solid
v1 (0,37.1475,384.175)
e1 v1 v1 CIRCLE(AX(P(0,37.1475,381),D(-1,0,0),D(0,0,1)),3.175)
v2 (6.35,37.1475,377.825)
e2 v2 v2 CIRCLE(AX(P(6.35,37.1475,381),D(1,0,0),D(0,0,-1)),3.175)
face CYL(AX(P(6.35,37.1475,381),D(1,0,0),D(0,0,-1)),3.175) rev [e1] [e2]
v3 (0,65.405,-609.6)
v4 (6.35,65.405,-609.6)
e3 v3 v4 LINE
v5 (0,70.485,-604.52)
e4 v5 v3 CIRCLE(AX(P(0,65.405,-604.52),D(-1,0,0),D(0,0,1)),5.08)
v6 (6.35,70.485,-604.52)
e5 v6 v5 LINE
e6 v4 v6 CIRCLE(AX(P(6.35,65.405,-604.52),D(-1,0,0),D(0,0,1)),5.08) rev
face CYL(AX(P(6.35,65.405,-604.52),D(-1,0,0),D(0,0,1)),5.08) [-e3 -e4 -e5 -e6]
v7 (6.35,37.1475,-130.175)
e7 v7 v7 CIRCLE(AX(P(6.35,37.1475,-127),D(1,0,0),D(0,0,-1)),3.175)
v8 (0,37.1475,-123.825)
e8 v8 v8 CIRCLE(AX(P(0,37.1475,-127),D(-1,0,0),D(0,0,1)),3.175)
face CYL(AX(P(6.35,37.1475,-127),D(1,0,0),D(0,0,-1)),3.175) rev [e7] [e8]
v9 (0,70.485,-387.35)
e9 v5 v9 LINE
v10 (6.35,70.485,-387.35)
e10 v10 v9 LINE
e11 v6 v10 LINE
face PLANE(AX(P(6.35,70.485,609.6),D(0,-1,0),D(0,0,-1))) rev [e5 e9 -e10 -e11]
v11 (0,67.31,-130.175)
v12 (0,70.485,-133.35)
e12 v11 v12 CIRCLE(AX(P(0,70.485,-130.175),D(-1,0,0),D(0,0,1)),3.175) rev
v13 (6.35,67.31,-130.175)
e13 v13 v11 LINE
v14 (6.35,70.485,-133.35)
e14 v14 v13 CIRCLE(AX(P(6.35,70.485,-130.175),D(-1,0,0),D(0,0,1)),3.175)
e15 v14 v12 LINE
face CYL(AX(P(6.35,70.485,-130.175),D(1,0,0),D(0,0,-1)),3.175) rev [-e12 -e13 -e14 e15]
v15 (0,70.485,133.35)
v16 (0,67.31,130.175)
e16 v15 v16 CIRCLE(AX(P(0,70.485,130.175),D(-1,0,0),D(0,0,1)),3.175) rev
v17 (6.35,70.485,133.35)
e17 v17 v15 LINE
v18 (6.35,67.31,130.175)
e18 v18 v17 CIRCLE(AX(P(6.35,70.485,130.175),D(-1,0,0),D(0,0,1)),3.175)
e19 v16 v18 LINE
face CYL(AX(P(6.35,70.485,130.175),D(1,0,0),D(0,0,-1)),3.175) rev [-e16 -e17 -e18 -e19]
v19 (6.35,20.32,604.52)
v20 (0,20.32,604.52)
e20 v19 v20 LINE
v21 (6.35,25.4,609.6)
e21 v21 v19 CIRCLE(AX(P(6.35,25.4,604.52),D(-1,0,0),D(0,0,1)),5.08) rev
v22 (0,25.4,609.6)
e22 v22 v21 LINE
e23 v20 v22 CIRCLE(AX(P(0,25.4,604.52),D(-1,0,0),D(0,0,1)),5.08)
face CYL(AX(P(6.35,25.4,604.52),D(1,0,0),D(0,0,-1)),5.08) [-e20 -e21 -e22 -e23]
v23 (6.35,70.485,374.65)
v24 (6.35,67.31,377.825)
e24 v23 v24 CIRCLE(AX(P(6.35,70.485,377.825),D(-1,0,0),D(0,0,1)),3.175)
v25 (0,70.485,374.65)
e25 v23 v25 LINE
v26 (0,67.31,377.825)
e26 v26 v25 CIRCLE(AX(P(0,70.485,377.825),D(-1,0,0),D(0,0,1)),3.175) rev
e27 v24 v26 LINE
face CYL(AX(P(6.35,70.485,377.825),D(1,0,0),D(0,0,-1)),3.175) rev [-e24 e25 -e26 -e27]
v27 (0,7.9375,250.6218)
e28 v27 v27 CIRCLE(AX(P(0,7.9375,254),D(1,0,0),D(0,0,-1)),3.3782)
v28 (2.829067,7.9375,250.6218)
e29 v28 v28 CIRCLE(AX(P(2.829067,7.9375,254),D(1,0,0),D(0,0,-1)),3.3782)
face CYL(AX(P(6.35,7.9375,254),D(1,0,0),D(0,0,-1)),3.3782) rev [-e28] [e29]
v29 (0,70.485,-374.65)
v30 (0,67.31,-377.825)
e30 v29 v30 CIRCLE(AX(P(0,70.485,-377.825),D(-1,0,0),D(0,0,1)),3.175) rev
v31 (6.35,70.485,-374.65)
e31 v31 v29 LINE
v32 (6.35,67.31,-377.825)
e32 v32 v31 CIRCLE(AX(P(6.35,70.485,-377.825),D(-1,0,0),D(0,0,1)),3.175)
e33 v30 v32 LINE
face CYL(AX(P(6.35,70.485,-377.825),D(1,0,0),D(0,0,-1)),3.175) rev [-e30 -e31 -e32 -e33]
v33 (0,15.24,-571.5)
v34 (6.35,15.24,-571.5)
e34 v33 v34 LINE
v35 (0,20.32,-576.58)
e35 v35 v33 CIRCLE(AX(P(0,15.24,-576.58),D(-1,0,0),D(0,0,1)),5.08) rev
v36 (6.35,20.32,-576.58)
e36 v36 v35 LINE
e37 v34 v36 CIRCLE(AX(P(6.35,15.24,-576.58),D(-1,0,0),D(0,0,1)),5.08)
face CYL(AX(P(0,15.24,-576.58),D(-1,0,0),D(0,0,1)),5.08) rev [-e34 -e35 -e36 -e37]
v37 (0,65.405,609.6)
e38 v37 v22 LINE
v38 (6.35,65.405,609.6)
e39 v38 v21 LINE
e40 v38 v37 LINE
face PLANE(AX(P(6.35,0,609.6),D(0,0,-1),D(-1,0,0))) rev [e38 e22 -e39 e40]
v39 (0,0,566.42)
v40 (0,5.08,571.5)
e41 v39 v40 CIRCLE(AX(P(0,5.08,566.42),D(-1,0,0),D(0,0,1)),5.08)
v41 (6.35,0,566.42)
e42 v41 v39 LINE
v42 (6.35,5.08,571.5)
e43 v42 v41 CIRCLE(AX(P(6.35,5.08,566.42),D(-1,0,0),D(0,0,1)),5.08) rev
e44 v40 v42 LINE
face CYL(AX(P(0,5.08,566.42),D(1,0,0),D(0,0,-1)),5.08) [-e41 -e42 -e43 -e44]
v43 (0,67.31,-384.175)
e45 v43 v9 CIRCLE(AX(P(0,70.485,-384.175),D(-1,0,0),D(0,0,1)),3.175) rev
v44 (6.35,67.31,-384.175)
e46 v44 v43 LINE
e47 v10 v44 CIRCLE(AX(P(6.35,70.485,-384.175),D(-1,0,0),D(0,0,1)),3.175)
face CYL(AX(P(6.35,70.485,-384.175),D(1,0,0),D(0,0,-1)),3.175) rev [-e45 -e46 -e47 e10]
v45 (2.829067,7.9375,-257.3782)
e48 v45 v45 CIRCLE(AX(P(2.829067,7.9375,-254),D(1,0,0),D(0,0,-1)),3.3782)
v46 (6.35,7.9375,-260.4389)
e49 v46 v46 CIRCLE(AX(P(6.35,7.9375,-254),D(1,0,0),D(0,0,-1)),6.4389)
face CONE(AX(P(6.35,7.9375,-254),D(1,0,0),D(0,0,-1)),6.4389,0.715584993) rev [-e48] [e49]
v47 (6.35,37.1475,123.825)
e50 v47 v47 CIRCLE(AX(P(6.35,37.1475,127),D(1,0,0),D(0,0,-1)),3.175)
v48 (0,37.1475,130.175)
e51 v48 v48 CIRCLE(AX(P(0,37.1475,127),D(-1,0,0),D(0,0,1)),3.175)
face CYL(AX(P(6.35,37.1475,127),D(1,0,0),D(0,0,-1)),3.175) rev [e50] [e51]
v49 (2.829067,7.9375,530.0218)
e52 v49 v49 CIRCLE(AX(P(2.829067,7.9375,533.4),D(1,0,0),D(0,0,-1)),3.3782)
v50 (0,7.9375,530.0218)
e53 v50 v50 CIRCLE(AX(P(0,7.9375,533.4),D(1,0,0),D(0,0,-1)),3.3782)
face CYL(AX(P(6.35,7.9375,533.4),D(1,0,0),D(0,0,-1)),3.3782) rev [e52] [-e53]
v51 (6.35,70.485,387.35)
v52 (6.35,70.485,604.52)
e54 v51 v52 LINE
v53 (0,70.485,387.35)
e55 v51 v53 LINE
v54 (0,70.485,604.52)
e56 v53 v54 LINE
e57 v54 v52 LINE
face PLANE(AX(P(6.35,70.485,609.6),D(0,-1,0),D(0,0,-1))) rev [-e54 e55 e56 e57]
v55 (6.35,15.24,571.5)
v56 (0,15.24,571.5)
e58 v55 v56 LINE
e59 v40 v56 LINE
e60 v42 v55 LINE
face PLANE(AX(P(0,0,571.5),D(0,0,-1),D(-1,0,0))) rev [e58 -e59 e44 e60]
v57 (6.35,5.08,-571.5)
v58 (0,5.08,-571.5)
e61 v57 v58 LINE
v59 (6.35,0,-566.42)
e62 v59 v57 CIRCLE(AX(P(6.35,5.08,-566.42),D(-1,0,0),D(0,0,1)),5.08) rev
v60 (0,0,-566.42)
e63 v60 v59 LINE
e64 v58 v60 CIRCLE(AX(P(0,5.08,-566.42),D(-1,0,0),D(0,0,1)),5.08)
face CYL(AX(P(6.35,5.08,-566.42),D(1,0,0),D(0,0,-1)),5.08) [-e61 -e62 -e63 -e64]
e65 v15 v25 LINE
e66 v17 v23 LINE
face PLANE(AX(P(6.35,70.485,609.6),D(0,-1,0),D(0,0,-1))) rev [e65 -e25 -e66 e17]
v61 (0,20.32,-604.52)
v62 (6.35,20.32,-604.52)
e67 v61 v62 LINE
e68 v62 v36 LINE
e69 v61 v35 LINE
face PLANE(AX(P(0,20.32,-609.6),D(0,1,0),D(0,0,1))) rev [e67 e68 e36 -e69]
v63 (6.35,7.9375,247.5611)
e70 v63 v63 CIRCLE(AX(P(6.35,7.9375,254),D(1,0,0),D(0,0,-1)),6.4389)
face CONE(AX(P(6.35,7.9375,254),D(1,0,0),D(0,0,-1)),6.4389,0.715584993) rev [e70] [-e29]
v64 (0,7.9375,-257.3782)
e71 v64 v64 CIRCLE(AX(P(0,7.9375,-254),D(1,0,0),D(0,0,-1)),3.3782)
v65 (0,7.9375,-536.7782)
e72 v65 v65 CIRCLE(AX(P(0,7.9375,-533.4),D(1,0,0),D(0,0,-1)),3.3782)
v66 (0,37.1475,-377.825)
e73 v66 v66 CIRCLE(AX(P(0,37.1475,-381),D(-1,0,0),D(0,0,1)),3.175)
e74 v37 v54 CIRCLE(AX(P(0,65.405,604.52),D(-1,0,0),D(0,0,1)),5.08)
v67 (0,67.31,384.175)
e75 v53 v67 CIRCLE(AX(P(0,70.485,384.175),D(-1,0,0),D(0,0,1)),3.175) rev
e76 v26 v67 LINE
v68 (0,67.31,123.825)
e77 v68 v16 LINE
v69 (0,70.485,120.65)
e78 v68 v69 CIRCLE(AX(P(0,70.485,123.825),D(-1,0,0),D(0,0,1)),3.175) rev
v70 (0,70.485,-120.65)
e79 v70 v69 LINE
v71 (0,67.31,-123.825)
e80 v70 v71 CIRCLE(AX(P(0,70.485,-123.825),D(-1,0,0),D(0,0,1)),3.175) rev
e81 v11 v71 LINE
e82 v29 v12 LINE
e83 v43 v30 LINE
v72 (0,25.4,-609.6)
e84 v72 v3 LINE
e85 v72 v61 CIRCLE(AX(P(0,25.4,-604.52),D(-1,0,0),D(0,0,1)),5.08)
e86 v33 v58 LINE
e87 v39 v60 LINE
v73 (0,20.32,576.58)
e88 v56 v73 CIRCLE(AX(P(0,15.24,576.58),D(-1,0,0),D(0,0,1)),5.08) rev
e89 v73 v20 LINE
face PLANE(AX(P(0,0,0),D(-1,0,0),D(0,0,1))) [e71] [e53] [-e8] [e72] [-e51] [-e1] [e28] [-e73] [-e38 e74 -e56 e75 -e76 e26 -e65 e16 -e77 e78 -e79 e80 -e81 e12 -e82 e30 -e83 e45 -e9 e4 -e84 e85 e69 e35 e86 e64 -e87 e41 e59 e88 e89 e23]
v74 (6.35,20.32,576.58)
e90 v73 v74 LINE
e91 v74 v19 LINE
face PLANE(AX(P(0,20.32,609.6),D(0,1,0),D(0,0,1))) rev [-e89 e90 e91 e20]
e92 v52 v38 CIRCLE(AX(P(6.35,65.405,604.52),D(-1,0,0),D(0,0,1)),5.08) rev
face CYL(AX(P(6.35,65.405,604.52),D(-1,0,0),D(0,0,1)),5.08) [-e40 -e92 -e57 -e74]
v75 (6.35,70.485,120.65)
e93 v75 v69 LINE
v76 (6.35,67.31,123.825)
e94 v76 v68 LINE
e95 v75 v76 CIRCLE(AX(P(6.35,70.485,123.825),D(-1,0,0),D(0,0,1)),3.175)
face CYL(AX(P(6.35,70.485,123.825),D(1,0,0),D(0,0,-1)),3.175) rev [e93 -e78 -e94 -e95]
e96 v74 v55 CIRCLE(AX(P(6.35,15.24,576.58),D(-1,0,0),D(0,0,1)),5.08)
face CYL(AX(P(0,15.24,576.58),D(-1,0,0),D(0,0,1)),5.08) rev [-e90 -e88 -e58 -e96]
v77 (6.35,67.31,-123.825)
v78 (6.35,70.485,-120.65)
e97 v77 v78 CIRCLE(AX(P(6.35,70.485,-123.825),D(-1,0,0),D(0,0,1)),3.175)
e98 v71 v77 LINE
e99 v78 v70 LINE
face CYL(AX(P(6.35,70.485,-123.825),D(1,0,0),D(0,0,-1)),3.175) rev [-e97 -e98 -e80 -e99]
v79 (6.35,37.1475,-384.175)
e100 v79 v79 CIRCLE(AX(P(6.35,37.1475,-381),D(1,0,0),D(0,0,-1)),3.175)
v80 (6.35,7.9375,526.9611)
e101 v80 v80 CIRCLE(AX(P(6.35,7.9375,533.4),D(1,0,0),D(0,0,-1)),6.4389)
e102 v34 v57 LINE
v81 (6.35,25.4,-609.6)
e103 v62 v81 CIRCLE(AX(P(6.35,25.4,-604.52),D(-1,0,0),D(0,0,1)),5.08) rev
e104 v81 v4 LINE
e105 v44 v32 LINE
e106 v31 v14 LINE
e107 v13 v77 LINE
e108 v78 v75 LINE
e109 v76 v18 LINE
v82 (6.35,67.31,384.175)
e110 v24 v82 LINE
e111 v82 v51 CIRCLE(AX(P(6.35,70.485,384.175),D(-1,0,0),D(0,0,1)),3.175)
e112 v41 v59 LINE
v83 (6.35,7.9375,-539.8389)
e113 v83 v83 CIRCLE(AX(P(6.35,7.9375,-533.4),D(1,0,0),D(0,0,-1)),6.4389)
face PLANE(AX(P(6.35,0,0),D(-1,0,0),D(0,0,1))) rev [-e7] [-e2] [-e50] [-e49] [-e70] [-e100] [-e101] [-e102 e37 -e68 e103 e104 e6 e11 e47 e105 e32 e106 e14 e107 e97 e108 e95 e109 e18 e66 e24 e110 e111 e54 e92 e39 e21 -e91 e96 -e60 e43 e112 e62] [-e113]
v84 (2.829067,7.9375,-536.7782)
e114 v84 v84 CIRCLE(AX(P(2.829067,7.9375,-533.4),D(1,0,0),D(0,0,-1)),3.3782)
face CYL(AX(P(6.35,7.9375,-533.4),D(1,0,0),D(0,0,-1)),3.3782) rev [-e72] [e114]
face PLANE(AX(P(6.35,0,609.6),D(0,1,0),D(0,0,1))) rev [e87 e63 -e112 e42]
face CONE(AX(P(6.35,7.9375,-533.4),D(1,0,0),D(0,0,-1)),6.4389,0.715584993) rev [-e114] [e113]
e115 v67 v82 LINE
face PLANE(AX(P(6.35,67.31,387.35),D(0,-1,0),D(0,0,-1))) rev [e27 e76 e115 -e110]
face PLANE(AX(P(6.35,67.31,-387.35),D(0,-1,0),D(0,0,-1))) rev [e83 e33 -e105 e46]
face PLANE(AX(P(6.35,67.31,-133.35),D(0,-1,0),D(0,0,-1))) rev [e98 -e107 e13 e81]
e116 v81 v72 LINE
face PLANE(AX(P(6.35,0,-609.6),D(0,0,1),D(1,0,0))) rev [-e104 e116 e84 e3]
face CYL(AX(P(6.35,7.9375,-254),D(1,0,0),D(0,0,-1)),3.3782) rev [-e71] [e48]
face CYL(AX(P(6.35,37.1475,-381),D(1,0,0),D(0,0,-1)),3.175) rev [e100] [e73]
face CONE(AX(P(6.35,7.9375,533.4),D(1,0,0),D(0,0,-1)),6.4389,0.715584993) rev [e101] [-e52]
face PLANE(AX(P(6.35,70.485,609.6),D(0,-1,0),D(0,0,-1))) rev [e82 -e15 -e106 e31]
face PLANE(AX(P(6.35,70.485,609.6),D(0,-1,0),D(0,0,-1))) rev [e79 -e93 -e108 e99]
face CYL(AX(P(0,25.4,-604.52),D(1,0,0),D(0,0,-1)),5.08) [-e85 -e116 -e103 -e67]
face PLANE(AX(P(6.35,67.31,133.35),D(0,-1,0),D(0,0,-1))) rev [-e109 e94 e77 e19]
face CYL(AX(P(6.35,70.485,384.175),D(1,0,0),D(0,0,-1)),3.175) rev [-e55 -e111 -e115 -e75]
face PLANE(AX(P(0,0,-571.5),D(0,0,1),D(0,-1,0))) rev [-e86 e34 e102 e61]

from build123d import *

# Parameters (mm, degrees)
SKETCH1_W                                     = 1219.2
SKETCH1_H                                     = 70.485
BOSS_EXTRUDE1_DEPTH                           = 6.35
CSK_FOR_1_4_FLAT_HEAD_MACHINE_SCREW1_AT_COUNT = 2
CSK_FOR_1_4_FLAT_HEAD_MACHINE_SCREW1_AT_PITCH = 279.4
CSK_FOR_1_4_FLAT_HEAD_MACHINE_SCREW1_2_COUNT  = 2
CSK_FOR_1_4_FLAT_HEAD_MACHINE_SCREW1_2_PITCH  = 787.4
CSK_FOR_1_4_FLAT_HEAD_MACHINE_SCREW1_3_COUNT  = 2
CSK_FOR_1_4_FLAT_HEAD_MACHINE_SCREW1_3_PITCH  = 1066.8
SKETCH4_W                                     = 38.1
SKETCH4_H                                     = 20.32
CUT_EXTRUDE1_DEPTH                            = 614.694237976
FILLET1_R                                     = 5.08
F_1_4_0_25_DIAMETER_HOLE1_D                   = 6.35
SKETCH7_W                                     = 12.7
SKETCH7_H                                     = 3.175
CUT_EXTRUDE2_DEPTH                            = 614.694237976
FILLET2_R                                     = 3.175


with BuildPart() as part:
    # Sketch1 → Boss-Extrude1 (new body)
    with BuildSketch(Plane(origin=(0, 0, 0), x_dir=(0, 0, -1), z_dir=(1, 0, 0))):
        with Locations((0, 35.2425)):
            Rectangle(SKETCH1_W, SKETCH1_H)
    extrude(amount=BOSS_EXTRUDE1_DEPTH)

    # Sketch3 → CSK for 1/4 Flat Head Machine Screw1 (revolve, cut)
    with BuildSketch(Plane(origin=(6.35, 7.9375, 533.4), x_dir=(0, 0, -1), z_dir=(0, 1, 0))):
        Polygon((0, 0), (0, 6.35), (3.3782, 6.35), (3.3782, 3.520932584), (6.4389, 0), align=None)
    csk_for_1_4_flat_head_machine_screw1 = revolve(axis=Axis((12.7, 7.9375, 533.4), (-1, 0, 0)), mode=Mode.SUBTRACT)

    # CSK for 1/4 Flat Head Machine Screw1 at: CSK for 1/4 Flat Head Machine Screw1 ×2
    with Locations(*[(0, 0, -i * CSK_FOR_1_4_FLAT_HEAD_MACHINE_SCREW1_AT_PITCH) for i in range(1, CSK_FOR_1_4_FLAT_HEAD_MACHINE_SCREW1_AT_COUNT)]):
        add(csk_for_1_4_flat_head_machine_screw1, mode=Mode.SUBTRACT)

    # CSK for 1_4 Flat Head Machine Screw1 2: CSK for 1/4 Flat Head Machine Screw1 ×2
    with Locations(*[(0, 0, -i * CSK_FOR_1_4_FLAT_HEAD_MACHINE_SCREW1_2_PITCH) for i in range(1, CSK_FOR_1_4_FLAT_HEAD_MACHINE_SCREW1_2_COUNT)]):
        add(csk_for_1_4_flat_head_machine_screw1, mode=Mode.SUBTRACT)

    # CSK for 1_4 Flat Head Machine Screw1 3: CSK for 1/4 Flat Head Machine Screw1 ×2
    with Locations(*[(0, 0, -i * CSK_FOR_1_4_FLAT_HEAD_MACHINE_SCREW1_3_PITCH) for i in range(1, CSK_FOR_1_4_FLAT_HEAD_MACHINE_SCREW1_3_COUNT)]):
        add(csk_for_1_4_flat_head_machine_screw1, mode=Mode.SUBTRACT)

    # Sketch4 → Cut-Extrude1 (cut, through all)
    with BuildSketch(Plane(origin=(6.35, 0, 0), x_dir=(0, 0, -1), z_dir=(1, 0, 0))):
        with Locations((-590.55, 10.16)):
            Rectangle(SKETCH4_W, SKETCH4_H)
        with Locations((590.55, 10.16)):
            Rectangle(SKETCH4_W, SKETCH4_H)
    extrude(amount=-CUT_EXTRUDE1_DEPTH, mode=Mode.SUBTRACT)

    # Fillet1
    fillet1_edges = [part.edges().sort_by_distance(p)[0] for p in [
        (3.175, 20.32, 609.6),
        (3.175, 20.32, 571.5),
        (3.175, 0, 571.5),
        (3.175, 0, -571.5),
        (3.175, 20.32, -571.5),
        (3.175, 20.32, -609.6),
        (3.175, 70.485, 609.6),
        (3.175, 70.485, -609.6),
    ]]
    fillet(fillet1_edges, radius=FILLET1_R)

    # 1/4 (0.25) Diameter Hole1 (through all)
    with Locations(Plane(origin=(6.35, 0, 0), x_dir=(0, 0, -1), z_dir=(1, 0, 0))):
        with Locations((-381, 37.1475), (-127, 37.1475), (127, 37.1475), (381, 37.1475)):
            Hole(F_1_4_0_25_DIAMETER_HOLE1_D / 2)

    # Sketch7 → Cut-Extrude2 (cut, through all)
    with BuildSketch(Plane.ZY):
        with Locations((-381, 68.8975)):
            Rectangle(SKETCH7_W, SKETCH7_H)
        with Locations((-127, 68.8975)):
            Rectangle(SKETCH7_W, SKETCH7_H)
        with Locations((127, 68.8975)):
            Rectangle(SKETCH7_W, SKETCH7_H)
        with Locations((381, 68.8975)):
            Rectangle(SKETCH7_W, SKETCH7_H)
    extrude(amount=-CUT_EXTRUDE2_DEPTH, mode=Mode.SUBTRACT)

    # Fillet2
    fillet2_edges = [part.edges().sort_by_distance(p)[0] for p in [
        (3.175, 67.31, 374.65),
        (3.175, 67.31, 387.35),
        (3.175, 67.31, 133.35),
        (3.175, 67.31, 120.65),
        (3.175, 67.31, -133.35),
        (3.175, 67.31, -120.65),
        (3.175, 67.31, -374.65),
        (3.175, 67.31, -387.35),
    ]]
    fillet(fillet2_edges, radius=FILLET2_R - 0.0001)  # a hair under: the kernel refuses the full size


solid = part.part
